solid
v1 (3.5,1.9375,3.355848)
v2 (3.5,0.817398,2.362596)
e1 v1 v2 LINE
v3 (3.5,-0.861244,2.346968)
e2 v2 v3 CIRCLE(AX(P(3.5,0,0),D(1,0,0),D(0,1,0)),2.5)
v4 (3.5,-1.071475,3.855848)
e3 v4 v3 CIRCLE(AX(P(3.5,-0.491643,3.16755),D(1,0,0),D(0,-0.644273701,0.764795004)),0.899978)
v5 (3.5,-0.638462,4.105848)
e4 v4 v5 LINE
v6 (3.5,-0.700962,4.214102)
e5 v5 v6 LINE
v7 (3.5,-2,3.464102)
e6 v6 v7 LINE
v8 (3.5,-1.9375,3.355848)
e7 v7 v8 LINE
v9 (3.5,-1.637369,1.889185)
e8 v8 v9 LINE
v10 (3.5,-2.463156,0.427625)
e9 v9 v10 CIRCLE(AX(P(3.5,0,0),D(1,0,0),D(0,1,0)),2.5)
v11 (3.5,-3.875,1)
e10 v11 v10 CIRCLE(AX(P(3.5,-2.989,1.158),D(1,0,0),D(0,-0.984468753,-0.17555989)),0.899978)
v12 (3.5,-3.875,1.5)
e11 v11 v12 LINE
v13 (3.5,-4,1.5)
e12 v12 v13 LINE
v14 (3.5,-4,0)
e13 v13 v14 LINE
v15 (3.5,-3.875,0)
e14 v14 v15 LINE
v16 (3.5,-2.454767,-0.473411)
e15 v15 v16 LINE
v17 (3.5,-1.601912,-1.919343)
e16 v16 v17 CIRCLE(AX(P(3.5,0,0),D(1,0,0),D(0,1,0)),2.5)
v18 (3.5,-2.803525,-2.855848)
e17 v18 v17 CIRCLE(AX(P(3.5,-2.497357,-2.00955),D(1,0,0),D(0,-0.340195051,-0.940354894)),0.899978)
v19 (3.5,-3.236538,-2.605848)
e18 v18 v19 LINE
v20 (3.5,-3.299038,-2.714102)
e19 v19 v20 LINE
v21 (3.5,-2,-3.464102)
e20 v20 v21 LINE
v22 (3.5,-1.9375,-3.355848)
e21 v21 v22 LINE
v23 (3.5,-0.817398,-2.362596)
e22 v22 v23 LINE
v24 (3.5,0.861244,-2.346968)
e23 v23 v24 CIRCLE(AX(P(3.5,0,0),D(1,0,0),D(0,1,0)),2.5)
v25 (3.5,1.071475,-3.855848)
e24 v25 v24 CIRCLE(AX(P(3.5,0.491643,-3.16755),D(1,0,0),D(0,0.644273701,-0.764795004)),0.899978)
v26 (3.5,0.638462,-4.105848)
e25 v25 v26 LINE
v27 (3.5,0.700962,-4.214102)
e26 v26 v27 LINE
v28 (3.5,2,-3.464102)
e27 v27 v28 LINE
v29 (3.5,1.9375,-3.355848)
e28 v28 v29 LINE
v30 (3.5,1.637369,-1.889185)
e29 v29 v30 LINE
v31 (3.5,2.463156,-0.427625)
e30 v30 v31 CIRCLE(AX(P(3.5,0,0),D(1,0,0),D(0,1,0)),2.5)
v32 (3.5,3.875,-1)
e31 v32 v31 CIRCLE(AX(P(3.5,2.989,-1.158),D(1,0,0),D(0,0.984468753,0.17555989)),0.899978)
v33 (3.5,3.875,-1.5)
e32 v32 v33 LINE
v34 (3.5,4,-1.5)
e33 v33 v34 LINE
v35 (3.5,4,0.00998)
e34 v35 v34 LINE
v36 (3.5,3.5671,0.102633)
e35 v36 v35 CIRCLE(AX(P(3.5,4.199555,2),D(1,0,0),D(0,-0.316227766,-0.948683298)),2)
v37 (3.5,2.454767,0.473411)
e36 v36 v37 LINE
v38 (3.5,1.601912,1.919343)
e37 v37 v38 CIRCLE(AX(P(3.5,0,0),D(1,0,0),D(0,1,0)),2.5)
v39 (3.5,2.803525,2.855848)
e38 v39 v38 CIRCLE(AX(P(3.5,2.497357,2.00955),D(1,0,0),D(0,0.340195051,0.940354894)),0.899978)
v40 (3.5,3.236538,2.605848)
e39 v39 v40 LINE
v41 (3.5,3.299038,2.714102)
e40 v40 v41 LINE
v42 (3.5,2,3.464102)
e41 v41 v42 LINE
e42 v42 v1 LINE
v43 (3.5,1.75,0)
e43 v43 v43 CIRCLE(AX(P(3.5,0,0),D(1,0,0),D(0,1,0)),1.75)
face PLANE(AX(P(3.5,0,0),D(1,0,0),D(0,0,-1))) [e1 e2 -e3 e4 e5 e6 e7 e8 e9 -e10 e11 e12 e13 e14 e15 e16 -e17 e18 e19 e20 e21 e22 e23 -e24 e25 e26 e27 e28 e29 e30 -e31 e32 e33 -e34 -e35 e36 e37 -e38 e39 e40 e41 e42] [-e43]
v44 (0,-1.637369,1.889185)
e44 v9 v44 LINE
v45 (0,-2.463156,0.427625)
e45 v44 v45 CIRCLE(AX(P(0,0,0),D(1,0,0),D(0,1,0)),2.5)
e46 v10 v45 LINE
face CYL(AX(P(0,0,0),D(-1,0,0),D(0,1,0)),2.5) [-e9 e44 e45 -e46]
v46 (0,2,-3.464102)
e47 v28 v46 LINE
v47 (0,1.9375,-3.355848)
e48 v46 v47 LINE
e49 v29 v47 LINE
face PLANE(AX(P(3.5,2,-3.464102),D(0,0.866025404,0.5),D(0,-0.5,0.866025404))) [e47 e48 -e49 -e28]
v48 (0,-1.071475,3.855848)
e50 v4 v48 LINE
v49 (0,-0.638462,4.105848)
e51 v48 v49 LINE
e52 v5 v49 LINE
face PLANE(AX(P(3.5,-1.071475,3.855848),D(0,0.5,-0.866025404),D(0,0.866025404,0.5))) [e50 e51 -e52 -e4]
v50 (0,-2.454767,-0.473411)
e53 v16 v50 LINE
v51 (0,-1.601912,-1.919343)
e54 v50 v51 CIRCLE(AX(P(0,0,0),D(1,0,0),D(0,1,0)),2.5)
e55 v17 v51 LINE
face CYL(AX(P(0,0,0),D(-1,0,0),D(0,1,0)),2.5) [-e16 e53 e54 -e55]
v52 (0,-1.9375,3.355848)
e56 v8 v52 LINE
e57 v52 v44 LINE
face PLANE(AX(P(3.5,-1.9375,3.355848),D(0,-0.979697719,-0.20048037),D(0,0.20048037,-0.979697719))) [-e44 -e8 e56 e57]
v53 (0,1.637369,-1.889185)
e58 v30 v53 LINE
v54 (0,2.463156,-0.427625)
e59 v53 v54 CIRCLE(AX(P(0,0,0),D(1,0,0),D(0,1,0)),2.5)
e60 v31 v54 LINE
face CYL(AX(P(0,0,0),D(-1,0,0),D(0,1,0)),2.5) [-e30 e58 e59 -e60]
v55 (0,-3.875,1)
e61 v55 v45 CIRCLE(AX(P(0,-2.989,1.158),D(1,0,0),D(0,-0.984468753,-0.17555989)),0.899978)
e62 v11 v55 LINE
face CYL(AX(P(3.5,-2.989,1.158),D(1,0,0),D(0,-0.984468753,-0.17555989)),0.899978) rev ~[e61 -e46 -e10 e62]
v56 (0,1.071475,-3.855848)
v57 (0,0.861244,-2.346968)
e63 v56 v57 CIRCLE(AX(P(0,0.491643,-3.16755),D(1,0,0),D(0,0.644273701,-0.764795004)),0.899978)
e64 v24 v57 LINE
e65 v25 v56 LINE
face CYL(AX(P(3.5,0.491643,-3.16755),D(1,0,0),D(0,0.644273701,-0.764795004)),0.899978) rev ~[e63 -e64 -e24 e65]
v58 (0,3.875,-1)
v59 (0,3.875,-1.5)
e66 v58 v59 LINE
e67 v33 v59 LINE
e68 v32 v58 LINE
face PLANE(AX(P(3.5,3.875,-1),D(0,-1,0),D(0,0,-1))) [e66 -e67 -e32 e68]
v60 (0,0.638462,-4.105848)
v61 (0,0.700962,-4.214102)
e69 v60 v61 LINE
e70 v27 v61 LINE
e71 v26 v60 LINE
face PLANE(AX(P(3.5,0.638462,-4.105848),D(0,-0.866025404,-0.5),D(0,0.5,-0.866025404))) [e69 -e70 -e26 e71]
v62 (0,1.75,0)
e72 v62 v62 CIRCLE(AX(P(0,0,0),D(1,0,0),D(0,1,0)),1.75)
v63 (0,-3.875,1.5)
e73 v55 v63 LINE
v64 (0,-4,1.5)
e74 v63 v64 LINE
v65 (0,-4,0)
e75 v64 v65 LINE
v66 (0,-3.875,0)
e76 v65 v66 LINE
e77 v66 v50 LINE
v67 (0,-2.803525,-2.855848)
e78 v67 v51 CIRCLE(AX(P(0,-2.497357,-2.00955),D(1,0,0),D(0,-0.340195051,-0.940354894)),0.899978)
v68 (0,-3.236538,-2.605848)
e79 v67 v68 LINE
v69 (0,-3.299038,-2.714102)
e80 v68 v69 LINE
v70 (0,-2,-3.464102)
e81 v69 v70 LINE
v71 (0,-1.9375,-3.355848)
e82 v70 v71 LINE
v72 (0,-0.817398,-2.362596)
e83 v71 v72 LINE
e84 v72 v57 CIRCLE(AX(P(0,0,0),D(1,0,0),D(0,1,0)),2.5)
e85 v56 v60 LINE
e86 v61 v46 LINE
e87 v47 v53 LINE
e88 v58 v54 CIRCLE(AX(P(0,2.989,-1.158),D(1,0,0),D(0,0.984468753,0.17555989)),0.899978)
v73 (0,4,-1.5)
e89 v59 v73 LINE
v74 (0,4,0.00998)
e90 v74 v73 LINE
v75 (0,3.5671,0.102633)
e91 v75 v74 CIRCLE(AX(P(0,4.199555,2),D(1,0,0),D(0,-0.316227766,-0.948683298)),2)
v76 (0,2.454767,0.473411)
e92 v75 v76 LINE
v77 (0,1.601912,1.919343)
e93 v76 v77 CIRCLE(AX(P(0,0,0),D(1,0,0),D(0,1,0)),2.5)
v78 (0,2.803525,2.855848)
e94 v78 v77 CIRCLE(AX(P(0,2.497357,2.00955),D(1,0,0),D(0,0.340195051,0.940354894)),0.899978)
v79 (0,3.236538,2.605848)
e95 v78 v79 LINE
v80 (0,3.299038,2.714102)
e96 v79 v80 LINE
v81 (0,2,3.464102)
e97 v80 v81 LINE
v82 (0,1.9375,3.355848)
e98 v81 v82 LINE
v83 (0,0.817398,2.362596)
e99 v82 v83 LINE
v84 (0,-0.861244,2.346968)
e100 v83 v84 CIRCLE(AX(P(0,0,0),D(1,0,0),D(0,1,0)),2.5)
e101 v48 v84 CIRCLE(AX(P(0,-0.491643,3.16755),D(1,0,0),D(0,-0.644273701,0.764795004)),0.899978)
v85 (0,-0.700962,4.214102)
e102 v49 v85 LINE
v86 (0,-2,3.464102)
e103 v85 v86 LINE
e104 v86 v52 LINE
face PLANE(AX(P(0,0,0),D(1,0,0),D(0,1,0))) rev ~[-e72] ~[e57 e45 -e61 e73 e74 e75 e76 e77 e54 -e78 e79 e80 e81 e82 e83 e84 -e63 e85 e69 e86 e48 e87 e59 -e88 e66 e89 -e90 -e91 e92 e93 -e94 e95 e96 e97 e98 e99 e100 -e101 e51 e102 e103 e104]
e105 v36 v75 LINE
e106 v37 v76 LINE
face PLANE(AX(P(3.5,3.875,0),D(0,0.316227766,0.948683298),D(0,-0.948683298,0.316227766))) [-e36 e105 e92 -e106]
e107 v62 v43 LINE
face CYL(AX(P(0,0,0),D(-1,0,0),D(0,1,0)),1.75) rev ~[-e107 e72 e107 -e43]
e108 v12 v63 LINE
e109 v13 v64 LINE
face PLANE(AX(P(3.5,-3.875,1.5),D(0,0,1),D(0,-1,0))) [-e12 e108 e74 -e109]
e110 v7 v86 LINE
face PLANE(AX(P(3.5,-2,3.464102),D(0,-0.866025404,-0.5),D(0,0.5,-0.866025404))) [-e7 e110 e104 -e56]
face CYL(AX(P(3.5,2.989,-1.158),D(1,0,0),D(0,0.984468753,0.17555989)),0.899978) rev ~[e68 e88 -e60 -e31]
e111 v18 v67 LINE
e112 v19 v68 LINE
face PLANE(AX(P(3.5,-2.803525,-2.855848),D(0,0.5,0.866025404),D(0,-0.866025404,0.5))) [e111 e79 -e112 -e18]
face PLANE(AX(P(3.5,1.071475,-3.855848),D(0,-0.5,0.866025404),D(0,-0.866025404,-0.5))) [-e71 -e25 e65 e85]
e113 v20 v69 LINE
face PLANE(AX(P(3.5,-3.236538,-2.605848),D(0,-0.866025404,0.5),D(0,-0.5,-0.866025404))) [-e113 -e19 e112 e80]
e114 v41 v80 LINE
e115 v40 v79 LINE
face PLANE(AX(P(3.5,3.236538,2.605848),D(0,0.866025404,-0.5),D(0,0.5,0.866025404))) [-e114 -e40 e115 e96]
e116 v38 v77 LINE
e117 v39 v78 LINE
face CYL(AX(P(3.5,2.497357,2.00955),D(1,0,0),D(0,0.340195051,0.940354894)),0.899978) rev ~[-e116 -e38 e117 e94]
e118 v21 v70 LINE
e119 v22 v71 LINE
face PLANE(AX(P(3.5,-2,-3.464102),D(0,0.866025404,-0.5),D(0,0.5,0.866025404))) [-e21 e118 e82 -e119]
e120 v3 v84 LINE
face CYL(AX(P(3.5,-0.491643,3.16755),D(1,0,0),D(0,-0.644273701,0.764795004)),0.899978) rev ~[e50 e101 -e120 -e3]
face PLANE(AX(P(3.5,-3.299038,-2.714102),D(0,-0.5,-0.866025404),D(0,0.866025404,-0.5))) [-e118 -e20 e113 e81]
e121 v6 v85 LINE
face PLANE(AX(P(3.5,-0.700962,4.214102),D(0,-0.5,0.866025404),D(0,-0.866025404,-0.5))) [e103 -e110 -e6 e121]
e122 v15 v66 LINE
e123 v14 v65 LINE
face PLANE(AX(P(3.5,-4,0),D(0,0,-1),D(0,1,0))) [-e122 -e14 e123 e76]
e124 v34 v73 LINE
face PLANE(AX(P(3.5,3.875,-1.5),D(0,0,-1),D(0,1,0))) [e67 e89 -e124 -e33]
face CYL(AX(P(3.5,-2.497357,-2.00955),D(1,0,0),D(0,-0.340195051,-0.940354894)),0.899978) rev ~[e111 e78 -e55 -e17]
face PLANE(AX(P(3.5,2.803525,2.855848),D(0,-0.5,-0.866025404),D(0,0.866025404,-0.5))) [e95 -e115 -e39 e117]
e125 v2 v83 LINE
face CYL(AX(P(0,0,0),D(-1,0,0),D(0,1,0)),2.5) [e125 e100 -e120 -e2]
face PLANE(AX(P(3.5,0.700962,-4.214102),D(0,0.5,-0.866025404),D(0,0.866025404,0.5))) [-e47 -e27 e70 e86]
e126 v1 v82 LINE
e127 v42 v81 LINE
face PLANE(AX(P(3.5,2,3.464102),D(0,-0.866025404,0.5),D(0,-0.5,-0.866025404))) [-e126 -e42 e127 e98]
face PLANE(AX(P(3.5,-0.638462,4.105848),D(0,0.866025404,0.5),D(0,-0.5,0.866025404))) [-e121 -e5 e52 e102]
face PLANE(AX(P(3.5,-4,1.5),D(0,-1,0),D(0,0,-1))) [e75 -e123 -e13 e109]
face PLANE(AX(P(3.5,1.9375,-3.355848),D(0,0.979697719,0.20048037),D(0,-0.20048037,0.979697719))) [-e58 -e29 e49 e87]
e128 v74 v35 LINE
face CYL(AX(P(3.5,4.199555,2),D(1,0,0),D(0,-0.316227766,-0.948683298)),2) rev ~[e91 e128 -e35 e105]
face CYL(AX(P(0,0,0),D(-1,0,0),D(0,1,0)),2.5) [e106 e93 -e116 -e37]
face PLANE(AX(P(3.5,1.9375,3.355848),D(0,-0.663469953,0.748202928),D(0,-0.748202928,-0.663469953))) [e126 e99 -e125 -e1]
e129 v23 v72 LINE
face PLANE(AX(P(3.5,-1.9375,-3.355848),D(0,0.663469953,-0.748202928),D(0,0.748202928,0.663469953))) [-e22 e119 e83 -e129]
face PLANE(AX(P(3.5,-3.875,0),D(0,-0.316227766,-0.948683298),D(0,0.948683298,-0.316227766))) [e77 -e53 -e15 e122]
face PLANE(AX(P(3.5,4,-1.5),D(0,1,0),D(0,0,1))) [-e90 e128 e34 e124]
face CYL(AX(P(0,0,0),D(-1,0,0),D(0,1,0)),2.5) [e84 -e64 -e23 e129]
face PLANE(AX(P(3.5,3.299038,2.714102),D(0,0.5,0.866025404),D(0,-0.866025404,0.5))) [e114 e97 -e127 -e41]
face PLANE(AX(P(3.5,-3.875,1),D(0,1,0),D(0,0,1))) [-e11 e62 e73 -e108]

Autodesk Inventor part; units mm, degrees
ref_plane "YZ Plane" through (0, 0, 0) normal (1, 0, 0) x (0, 1, 0)
ref_plane "XZ Plane" through (0, 0, 0) normal (0, 1, 0) x (-1, 0, 0)
ref_plane "XY Plane" through (0, 0, 0) normal (0, 0, 1) x (1, 0, 0)
sketch "Sketch1" plane through (0, 0, 0) normal (1, 0, 0) x (0, 1, 0)
  circle A0 centre (0, 0) radius 1.75
  circle A1 centre (0, 0) radius 2.5
  dimension "d0" = 3.5
  dimension "d1" = 5
extrude "Extrusion1" add sketch "Sketch1" along normal blind 3.5
sketch "Sketch2" plane through (3.5, 0, 0) normal (1, 0, 0) x (0, 0, -1)
  circle A0 centre (0, 0) radius 2.5 construction
  line L0 (0, 2.5) -> (0, 2.375) construction
  line L1 (0, 2.375) -> (0.25, 2.375) construction
  line L2 (0.25, 2.375) -> (-0.25, 2.375) construction
  line L3 (-0.25, 2.375) -> (0.25, 2.375)
  line L4 (0, 2.375) -> (-0.5, 2.375)
  line L5 (-0.5, 2.375) -> (0.5, 2.375)
  line L6 (0, 2.375) -> (0, 3.875) construction
  line L7 (0, 3.875) -> (1, 3.875) construction
  line L8 (0, 3.875) -> (1, 3.875)
  line L9 (0, 3.875) -> (-0.5, 2.375)
  arc A1 (1, 3.875) -> (0.5, 2.375) centre (1.158, 2.989) ccw
  line L10 (0, 3.875) -> (1.5, 3.875)
  line L11 (1.5, 3.875) -> (1.5, 4)
  line L12 (1.5, 4) -> (0, 4)
  line L13 (0, 4) -> (0, 3.875)
  dimension "d4" = 0.125
  dimension "d5" = 0.25
  dimension "d6" = 0.5
  dimension "d11" = 0.5
  dimension "d12" = 1
  dimension "d14" = 1
  dimension "d15" = 0.9
  dimension "d16" = 1.5
  dimension "d17" = 0.125
extrude "Extrusion2" add sketch "Sketch2" against normal blind 3.5
fillet "Fillet1" radius 2 1 edges at (1.75, 3.875, 0)
pattern_circular "Circular Pattern1" count 6 over 360 about axis through (0, 0, 0) along (1, 0, 0) of "Extrusion2"
properties part number "mtv_gear6_1-15"
